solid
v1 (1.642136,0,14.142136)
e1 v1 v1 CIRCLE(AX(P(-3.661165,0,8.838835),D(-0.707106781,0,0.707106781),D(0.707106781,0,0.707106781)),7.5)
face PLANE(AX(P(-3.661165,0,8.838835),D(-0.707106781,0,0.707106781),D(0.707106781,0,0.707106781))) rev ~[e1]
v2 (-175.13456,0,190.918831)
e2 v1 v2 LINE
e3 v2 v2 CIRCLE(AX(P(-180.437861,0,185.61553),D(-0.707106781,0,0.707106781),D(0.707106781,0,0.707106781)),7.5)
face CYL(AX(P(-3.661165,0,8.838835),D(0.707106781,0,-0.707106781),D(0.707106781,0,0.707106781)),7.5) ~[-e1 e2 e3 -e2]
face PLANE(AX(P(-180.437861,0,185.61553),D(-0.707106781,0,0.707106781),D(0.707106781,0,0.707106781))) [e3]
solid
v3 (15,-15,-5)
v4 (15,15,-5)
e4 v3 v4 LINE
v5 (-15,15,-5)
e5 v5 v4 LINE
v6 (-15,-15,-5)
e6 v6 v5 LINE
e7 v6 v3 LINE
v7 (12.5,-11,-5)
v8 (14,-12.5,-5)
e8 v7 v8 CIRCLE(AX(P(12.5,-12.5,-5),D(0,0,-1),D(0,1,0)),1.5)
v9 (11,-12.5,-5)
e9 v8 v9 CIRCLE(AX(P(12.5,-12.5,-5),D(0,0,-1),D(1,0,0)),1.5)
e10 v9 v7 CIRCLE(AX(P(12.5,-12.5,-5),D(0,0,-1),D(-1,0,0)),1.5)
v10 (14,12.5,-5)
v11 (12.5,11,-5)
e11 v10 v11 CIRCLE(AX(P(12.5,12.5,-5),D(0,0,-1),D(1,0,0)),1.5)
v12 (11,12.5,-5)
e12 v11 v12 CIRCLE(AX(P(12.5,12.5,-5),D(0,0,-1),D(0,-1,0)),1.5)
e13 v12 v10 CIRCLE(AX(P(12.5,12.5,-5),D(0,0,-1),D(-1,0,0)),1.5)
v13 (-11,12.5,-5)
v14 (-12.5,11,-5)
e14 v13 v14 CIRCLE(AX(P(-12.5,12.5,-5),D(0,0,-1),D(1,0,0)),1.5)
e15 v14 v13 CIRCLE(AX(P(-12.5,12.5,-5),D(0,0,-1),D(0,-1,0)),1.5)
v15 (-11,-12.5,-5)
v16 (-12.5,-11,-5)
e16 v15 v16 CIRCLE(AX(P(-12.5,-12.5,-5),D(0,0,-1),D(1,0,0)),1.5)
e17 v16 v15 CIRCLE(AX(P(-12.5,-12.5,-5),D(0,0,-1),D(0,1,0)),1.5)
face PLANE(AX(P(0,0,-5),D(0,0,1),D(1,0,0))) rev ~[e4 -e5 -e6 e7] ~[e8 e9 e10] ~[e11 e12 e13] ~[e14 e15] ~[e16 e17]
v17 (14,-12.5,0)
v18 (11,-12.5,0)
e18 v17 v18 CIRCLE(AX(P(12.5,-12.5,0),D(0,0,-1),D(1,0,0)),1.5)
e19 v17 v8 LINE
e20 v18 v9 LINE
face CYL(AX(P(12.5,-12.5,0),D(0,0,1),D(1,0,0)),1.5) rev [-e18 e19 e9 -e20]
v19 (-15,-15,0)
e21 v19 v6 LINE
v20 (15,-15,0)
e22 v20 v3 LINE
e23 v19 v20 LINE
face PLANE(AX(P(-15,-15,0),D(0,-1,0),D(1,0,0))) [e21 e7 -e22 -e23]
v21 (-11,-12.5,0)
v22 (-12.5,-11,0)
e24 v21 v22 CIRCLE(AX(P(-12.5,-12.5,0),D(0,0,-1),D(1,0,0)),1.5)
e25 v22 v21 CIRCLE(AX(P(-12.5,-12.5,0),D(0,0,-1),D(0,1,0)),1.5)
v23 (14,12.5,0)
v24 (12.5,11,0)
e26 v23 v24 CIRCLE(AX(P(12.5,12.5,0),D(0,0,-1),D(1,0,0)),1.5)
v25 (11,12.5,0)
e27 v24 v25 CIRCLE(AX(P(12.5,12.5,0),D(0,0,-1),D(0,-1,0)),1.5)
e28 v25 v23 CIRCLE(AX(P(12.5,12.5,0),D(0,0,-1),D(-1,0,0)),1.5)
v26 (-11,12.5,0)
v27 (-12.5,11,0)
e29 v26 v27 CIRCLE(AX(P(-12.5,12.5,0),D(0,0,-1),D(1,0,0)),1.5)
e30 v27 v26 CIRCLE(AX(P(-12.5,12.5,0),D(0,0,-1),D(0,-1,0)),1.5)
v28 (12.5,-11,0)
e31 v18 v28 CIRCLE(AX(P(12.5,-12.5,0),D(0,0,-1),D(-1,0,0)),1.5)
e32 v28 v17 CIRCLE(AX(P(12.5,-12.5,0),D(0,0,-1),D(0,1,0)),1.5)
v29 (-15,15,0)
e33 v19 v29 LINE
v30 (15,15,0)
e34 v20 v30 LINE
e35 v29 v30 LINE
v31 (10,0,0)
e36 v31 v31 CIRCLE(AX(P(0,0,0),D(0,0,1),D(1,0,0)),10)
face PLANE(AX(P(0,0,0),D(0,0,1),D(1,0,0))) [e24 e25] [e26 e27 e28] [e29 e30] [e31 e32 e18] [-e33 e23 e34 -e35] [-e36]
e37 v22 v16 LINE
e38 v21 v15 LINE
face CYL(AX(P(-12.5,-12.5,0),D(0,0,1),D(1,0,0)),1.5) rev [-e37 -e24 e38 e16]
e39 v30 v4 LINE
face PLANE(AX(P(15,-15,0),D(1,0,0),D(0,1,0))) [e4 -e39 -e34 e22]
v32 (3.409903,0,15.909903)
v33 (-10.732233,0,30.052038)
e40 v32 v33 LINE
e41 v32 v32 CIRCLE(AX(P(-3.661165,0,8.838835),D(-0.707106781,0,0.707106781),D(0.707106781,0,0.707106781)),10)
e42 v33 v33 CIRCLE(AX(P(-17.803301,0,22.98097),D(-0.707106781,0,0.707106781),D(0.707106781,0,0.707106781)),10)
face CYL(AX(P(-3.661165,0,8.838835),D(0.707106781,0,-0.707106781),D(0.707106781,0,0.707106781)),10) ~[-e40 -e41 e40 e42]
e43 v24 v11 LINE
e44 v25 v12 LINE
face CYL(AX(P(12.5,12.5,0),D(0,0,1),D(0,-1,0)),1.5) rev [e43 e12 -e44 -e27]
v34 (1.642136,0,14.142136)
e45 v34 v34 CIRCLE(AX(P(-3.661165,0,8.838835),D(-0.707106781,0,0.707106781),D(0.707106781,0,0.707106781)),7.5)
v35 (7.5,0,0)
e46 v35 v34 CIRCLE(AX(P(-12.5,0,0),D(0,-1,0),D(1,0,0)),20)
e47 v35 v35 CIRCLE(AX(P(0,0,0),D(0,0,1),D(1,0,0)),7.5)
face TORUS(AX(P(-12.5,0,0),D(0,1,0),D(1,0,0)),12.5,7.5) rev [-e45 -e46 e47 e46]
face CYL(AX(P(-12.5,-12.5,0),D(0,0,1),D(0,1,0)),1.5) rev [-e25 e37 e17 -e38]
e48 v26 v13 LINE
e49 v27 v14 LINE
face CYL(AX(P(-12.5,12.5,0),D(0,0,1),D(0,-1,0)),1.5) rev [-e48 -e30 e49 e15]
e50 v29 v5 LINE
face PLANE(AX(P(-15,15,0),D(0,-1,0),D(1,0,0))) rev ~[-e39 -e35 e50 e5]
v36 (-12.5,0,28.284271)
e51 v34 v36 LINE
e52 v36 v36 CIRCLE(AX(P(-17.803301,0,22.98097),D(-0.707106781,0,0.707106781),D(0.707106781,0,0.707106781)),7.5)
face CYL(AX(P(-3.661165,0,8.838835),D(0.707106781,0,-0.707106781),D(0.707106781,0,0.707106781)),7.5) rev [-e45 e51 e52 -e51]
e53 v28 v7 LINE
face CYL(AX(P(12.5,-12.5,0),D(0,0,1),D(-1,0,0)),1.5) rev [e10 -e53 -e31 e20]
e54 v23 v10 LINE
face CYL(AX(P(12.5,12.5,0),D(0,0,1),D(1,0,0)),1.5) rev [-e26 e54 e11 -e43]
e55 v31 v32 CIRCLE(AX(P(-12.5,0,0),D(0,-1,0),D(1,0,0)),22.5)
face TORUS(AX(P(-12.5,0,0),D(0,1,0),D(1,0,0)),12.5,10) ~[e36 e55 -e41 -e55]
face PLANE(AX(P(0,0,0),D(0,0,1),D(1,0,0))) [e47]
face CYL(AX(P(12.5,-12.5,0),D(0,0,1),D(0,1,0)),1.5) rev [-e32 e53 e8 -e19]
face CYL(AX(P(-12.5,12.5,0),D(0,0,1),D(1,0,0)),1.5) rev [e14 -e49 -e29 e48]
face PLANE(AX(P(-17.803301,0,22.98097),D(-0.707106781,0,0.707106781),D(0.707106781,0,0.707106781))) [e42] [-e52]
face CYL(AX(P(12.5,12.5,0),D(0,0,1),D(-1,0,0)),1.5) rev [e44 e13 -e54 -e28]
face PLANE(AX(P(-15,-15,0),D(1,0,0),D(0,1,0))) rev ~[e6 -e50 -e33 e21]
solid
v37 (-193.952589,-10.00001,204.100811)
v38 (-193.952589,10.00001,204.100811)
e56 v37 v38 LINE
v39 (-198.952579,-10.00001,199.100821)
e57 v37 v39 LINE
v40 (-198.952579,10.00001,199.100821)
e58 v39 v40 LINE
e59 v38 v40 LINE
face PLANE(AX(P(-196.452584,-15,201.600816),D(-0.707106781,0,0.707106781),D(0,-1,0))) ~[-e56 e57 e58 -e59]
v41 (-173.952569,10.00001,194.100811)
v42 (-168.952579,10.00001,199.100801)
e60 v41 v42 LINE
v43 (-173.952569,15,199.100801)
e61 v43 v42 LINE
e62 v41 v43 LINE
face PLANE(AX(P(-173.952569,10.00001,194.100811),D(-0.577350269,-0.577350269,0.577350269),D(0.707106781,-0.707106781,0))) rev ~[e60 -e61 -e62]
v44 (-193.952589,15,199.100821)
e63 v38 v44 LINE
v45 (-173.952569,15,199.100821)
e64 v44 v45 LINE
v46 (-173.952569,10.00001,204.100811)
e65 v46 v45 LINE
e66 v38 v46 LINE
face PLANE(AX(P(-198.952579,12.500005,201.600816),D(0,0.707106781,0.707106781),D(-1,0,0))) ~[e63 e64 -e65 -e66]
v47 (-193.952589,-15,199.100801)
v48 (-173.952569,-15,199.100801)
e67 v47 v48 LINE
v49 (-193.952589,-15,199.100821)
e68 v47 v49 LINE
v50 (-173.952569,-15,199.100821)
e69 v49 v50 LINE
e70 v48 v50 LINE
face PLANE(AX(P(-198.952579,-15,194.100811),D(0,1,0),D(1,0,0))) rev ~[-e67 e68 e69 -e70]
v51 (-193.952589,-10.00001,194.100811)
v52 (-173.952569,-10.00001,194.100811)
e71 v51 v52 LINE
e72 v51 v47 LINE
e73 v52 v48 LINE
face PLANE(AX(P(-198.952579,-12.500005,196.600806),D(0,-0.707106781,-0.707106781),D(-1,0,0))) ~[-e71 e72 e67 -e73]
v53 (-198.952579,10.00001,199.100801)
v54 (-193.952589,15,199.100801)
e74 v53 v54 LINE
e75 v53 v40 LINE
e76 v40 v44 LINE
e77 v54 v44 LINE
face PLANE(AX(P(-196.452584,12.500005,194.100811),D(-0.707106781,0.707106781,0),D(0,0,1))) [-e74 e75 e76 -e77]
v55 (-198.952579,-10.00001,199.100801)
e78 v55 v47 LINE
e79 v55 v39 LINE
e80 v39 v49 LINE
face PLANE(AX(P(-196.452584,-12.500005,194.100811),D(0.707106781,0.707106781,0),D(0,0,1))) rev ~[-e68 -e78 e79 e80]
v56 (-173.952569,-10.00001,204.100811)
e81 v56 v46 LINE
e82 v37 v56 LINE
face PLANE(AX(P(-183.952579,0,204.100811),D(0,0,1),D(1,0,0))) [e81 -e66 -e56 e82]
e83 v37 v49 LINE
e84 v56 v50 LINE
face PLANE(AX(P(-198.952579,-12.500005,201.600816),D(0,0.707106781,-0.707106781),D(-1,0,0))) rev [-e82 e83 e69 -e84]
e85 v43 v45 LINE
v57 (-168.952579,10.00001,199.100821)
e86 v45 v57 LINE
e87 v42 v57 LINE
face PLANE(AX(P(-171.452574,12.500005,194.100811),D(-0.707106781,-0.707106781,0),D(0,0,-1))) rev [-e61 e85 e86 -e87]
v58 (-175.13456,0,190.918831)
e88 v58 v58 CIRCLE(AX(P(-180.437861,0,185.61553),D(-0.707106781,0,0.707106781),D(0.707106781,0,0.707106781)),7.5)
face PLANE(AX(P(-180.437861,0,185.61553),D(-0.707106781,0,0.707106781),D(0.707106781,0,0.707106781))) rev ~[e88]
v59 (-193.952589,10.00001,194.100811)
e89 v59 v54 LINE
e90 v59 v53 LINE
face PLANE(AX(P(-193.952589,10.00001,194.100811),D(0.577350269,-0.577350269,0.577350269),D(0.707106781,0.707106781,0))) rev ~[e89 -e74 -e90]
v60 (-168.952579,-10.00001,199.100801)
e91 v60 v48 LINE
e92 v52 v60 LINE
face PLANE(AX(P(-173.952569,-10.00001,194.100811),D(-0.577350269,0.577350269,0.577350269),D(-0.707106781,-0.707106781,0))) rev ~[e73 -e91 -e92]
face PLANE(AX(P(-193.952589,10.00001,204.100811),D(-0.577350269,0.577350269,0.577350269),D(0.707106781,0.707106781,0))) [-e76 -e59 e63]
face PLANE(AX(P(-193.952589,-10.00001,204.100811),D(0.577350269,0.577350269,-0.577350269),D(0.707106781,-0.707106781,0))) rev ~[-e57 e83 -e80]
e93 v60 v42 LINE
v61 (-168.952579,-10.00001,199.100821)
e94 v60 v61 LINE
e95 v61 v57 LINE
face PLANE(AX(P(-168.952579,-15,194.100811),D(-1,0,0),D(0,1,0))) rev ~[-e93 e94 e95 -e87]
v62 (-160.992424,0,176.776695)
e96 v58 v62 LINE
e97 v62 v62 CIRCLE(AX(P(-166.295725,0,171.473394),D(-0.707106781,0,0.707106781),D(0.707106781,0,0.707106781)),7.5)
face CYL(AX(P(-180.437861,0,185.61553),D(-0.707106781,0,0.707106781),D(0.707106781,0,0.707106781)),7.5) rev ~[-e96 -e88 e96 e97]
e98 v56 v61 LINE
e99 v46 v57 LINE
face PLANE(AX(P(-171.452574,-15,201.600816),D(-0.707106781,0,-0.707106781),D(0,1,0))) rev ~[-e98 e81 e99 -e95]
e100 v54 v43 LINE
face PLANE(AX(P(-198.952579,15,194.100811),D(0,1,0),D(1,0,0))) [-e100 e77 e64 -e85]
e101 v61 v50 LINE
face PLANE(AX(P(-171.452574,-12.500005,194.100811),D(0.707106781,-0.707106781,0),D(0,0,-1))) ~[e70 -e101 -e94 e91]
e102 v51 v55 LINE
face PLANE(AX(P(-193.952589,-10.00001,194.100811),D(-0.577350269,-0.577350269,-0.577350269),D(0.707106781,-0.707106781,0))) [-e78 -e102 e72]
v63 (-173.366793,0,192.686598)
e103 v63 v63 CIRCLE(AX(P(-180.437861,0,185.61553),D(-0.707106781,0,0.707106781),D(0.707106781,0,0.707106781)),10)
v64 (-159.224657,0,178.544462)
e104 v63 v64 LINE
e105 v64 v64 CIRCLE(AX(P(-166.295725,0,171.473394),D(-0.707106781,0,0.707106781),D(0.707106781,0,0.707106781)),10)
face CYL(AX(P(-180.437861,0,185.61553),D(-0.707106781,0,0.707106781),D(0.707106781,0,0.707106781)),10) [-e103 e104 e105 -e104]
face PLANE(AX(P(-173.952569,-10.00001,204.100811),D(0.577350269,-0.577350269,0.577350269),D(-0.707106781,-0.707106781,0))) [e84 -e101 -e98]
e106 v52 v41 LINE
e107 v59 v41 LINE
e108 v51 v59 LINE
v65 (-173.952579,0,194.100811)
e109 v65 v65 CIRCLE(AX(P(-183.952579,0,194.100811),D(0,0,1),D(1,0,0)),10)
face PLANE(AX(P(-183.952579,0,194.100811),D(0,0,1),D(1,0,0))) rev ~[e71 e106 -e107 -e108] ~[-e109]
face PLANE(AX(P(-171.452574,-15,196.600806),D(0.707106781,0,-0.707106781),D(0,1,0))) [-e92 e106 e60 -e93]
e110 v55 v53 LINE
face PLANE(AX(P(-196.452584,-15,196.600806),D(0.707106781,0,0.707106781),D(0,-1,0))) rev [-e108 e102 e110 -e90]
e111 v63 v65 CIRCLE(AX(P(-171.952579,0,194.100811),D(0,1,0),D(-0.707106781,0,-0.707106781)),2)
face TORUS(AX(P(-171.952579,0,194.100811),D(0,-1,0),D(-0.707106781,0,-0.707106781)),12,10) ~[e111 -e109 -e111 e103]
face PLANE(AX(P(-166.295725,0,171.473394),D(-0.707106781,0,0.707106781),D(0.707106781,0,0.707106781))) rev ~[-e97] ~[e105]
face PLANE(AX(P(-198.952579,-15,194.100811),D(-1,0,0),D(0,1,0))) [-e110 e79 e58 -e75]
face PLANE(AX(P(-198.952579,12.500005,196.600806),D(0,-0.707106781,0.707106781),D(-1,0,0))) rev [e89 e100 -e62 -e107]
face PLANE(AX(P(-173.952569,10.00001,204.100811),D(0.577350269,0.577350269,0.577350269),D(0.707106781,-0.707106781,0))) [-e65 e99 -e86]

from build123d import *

# Parameters (mm, degrees)
F0_W      = 30
F0_H      = 30
F0_R      = 10
F0_R_2    = 7.5
F1_DEPTH  = 5
F2_ANGLE  = 45
F4_DEPTH  = 20
F3_R      = 7.5
F5_DEPTH  = 250
F6_R      = 10
F6_R_2    = 7.5
F7_ANGLE  = 45
F8_DEPTH  = 20
F9_W      = 30
F9_H      = 30
F9_R      = 10
F10_DEPTH = 10
F11_SIZE  = 4.99999


# Not quite as in the source:
# - a fillet or chamfer is up to 0.001 mm smaller than in the source, because OpenCascade refuses the exact size


with BuildPart() as f1:
    # F0 (on Top) → F1 (new body)
    with BuildSketch(Plane.XY):
        Rectangle(F0_W, F0_H)
        with BuildLine():
            Line((11, -12.5), (-11, -12.5))
            ThreePointArc((-11, -12.5), (-13.5606601718, -13.5606601718), (-12.5, -11))
            Line((-12.5, -11), (-12.5, 11))
            ThreePointArc((-12.5, 11), (-13.5606601718, 13.5606601718), (-11, 12.5))
            Line((-11, 12.5), (11, 12.5))
            ThreePointArc((11, 12.5), (12.5, 14), (14, 12.5))
            ThreePointArc((14, 12.5), (13.5606601718, 11.4393398282), (12.5, 11))
            Line((12.5, 11), (12.5, -11))
            ThreePointArc((12.5, -11), (13.5606601718, -11.4393398282), (14, -12.5))
            ThreePointArc((14, -12.5), (12.5, -14), (11, -12.5))
        make_face(mode=Mode.SUBTRACT)
        with BuildLine():
            ThreePointArc((-12.5, -11), (-11.4393398282, -11.4393398282), (-11, -12.5))
            Line((-11, -12.5), (11, -12.5))
            ThreePointArc((11, -12.5), (11.4393398282, -11.4393398282), (12.5, -11))
            Line((12.5, -11), (12.5, 11))
            ThreePointArc((12.5, 11), (11.4393398282, 11.4393398282), (11, 12.5))
            Line((11, 12.5), (-11, 12.5))
            ThreePointArc((-11, 12.5), (-11.4393398282, 11.4393398282), (-12.5, 11))
            Line((-12.5, 11), (-12.5, -11))
        make_face()
        Circle(F0_R, mode=Mode.SUBTRACT)
        Circle(F0_R)
        Circle(F0_R_2, mode=Mode.SUBTRACT)
        Circle(F0_R_2)
    extrude(amount=-F1_DEPTH)

    # F0 (on Top) → F2 (revolve)
    with BuildSketch(Plane.XY):
        Circle(F0_R)
        Circle(F0_R_2, mode=Mode.SUBTRACT)
    revolve(axis=Axis((-12.5, 0, 0), (0, -1, 0)), revolution_arc=F2_ANGLE)

    # F4 (add): a face of the model
    f4_faces = [f1.faces().sort_by_distance(p)[0] for p in [
        (-10.532233047, 0, 1.967766953),
    ]]
    extrude(f4_faces, amount=F4_DEPTH)


with BuildPart() as f5:
    # F3 (on face) → F5 (new body)
    with BuildSketch(Plane(origin=(-6.25, 0, 6.25), x_dir=(0.7071067812, 0, 0.7071067812), z_dir=(-0.7071067812, 0, 0.7071067812))):
        with Locations((3.6611652352, 0)):
            Circle(F3_R)
    extrude(amount=F5_DEPTH)


with BuildPart() as f7:
    # F6 (on face) → F7 (revolve)
    with BuildSketch(Plane(origin=(-183.0266952966, 0, 183.0266952966), x_dir=(0.7071067812, 0, 0.7071067812), z_dir=(-0.7071067812, 0, 0.7071067812))):
        with Locations((3.6611652352, 0)):
            Circle(F6_R)
        with Locations((3.6611652352, 0)):
            Circle(F6_R_2, mode=Mode.SUBTRACT)
        with Locations((3.6611652352, 0)):
            Circle(F6_R_2)
    revolve(axis=Axis((-171.9525791576, -0.2738032596, 194.1008114357), (0, 1, 0)), revolution_arc=F7_ANGLE)

    # F6 (on face) → F8 (join)
    with BuildSketch(Plane(origin=(-183.0266952966, 0, 183.0266952966), x_dir=(0.7071067812, 0, 0.7071067812), z_dir=(-0.7071067812, 0, 0.7071067812))):
        with Locations((3.6611652352, 0)):
            Circle(F6_R)
        with Locations((3.6611652352, 0)):
            Circle(F6_R_2, mode=Mode.SUBTRACT)
    extrude(amount=-F8_DEPTH)

    # F9 (on face) → F10 (join)
    with BuildSketch(Plane.XY.offset(194.1008114357)):
        with Locations((-183.9525791576, 0)):
            Rectangle(F9_W, F9_H)
        with Locations((-183.9525791576, 0)):
            Circle(F9_R, mode=Mode.SUBTRACT)
        with Locations((-183.9525791576, 0)):
            Circle(F9_R)
    extrude(amount=F10_DEPTH)

    # F11 (size 5 in the source; OpenCascade refuses exactly that, so slightly less here)
    f11_edges = [f7.edges().sort_by_distance(p)[0] for p in [
        (-198.952579, 15, 199.100811),
        (-198.952579, -15, 199.100811),
        (-198.952579, 0, 194.100811),
        (-198.952579, 0, 204.100811),
        (-168.952579, 15, 199.100811),
        (-183.952579, 15, 194.100811),
        (-183.952579, 15, 204.100811),
        (-168.952579, -15, 199.100811),
        (-168.952579, 0, 194.100811),
        (-168.952579, 0, 204.100811),
        (-183.952579, -15, 194.100811),
        (-183.952579, -15, 204.100811),
    ]]
    chamfer(f11_edges, length=F11_SIZE)


solid = Compound([f1.part, f5.part, f7.part])
